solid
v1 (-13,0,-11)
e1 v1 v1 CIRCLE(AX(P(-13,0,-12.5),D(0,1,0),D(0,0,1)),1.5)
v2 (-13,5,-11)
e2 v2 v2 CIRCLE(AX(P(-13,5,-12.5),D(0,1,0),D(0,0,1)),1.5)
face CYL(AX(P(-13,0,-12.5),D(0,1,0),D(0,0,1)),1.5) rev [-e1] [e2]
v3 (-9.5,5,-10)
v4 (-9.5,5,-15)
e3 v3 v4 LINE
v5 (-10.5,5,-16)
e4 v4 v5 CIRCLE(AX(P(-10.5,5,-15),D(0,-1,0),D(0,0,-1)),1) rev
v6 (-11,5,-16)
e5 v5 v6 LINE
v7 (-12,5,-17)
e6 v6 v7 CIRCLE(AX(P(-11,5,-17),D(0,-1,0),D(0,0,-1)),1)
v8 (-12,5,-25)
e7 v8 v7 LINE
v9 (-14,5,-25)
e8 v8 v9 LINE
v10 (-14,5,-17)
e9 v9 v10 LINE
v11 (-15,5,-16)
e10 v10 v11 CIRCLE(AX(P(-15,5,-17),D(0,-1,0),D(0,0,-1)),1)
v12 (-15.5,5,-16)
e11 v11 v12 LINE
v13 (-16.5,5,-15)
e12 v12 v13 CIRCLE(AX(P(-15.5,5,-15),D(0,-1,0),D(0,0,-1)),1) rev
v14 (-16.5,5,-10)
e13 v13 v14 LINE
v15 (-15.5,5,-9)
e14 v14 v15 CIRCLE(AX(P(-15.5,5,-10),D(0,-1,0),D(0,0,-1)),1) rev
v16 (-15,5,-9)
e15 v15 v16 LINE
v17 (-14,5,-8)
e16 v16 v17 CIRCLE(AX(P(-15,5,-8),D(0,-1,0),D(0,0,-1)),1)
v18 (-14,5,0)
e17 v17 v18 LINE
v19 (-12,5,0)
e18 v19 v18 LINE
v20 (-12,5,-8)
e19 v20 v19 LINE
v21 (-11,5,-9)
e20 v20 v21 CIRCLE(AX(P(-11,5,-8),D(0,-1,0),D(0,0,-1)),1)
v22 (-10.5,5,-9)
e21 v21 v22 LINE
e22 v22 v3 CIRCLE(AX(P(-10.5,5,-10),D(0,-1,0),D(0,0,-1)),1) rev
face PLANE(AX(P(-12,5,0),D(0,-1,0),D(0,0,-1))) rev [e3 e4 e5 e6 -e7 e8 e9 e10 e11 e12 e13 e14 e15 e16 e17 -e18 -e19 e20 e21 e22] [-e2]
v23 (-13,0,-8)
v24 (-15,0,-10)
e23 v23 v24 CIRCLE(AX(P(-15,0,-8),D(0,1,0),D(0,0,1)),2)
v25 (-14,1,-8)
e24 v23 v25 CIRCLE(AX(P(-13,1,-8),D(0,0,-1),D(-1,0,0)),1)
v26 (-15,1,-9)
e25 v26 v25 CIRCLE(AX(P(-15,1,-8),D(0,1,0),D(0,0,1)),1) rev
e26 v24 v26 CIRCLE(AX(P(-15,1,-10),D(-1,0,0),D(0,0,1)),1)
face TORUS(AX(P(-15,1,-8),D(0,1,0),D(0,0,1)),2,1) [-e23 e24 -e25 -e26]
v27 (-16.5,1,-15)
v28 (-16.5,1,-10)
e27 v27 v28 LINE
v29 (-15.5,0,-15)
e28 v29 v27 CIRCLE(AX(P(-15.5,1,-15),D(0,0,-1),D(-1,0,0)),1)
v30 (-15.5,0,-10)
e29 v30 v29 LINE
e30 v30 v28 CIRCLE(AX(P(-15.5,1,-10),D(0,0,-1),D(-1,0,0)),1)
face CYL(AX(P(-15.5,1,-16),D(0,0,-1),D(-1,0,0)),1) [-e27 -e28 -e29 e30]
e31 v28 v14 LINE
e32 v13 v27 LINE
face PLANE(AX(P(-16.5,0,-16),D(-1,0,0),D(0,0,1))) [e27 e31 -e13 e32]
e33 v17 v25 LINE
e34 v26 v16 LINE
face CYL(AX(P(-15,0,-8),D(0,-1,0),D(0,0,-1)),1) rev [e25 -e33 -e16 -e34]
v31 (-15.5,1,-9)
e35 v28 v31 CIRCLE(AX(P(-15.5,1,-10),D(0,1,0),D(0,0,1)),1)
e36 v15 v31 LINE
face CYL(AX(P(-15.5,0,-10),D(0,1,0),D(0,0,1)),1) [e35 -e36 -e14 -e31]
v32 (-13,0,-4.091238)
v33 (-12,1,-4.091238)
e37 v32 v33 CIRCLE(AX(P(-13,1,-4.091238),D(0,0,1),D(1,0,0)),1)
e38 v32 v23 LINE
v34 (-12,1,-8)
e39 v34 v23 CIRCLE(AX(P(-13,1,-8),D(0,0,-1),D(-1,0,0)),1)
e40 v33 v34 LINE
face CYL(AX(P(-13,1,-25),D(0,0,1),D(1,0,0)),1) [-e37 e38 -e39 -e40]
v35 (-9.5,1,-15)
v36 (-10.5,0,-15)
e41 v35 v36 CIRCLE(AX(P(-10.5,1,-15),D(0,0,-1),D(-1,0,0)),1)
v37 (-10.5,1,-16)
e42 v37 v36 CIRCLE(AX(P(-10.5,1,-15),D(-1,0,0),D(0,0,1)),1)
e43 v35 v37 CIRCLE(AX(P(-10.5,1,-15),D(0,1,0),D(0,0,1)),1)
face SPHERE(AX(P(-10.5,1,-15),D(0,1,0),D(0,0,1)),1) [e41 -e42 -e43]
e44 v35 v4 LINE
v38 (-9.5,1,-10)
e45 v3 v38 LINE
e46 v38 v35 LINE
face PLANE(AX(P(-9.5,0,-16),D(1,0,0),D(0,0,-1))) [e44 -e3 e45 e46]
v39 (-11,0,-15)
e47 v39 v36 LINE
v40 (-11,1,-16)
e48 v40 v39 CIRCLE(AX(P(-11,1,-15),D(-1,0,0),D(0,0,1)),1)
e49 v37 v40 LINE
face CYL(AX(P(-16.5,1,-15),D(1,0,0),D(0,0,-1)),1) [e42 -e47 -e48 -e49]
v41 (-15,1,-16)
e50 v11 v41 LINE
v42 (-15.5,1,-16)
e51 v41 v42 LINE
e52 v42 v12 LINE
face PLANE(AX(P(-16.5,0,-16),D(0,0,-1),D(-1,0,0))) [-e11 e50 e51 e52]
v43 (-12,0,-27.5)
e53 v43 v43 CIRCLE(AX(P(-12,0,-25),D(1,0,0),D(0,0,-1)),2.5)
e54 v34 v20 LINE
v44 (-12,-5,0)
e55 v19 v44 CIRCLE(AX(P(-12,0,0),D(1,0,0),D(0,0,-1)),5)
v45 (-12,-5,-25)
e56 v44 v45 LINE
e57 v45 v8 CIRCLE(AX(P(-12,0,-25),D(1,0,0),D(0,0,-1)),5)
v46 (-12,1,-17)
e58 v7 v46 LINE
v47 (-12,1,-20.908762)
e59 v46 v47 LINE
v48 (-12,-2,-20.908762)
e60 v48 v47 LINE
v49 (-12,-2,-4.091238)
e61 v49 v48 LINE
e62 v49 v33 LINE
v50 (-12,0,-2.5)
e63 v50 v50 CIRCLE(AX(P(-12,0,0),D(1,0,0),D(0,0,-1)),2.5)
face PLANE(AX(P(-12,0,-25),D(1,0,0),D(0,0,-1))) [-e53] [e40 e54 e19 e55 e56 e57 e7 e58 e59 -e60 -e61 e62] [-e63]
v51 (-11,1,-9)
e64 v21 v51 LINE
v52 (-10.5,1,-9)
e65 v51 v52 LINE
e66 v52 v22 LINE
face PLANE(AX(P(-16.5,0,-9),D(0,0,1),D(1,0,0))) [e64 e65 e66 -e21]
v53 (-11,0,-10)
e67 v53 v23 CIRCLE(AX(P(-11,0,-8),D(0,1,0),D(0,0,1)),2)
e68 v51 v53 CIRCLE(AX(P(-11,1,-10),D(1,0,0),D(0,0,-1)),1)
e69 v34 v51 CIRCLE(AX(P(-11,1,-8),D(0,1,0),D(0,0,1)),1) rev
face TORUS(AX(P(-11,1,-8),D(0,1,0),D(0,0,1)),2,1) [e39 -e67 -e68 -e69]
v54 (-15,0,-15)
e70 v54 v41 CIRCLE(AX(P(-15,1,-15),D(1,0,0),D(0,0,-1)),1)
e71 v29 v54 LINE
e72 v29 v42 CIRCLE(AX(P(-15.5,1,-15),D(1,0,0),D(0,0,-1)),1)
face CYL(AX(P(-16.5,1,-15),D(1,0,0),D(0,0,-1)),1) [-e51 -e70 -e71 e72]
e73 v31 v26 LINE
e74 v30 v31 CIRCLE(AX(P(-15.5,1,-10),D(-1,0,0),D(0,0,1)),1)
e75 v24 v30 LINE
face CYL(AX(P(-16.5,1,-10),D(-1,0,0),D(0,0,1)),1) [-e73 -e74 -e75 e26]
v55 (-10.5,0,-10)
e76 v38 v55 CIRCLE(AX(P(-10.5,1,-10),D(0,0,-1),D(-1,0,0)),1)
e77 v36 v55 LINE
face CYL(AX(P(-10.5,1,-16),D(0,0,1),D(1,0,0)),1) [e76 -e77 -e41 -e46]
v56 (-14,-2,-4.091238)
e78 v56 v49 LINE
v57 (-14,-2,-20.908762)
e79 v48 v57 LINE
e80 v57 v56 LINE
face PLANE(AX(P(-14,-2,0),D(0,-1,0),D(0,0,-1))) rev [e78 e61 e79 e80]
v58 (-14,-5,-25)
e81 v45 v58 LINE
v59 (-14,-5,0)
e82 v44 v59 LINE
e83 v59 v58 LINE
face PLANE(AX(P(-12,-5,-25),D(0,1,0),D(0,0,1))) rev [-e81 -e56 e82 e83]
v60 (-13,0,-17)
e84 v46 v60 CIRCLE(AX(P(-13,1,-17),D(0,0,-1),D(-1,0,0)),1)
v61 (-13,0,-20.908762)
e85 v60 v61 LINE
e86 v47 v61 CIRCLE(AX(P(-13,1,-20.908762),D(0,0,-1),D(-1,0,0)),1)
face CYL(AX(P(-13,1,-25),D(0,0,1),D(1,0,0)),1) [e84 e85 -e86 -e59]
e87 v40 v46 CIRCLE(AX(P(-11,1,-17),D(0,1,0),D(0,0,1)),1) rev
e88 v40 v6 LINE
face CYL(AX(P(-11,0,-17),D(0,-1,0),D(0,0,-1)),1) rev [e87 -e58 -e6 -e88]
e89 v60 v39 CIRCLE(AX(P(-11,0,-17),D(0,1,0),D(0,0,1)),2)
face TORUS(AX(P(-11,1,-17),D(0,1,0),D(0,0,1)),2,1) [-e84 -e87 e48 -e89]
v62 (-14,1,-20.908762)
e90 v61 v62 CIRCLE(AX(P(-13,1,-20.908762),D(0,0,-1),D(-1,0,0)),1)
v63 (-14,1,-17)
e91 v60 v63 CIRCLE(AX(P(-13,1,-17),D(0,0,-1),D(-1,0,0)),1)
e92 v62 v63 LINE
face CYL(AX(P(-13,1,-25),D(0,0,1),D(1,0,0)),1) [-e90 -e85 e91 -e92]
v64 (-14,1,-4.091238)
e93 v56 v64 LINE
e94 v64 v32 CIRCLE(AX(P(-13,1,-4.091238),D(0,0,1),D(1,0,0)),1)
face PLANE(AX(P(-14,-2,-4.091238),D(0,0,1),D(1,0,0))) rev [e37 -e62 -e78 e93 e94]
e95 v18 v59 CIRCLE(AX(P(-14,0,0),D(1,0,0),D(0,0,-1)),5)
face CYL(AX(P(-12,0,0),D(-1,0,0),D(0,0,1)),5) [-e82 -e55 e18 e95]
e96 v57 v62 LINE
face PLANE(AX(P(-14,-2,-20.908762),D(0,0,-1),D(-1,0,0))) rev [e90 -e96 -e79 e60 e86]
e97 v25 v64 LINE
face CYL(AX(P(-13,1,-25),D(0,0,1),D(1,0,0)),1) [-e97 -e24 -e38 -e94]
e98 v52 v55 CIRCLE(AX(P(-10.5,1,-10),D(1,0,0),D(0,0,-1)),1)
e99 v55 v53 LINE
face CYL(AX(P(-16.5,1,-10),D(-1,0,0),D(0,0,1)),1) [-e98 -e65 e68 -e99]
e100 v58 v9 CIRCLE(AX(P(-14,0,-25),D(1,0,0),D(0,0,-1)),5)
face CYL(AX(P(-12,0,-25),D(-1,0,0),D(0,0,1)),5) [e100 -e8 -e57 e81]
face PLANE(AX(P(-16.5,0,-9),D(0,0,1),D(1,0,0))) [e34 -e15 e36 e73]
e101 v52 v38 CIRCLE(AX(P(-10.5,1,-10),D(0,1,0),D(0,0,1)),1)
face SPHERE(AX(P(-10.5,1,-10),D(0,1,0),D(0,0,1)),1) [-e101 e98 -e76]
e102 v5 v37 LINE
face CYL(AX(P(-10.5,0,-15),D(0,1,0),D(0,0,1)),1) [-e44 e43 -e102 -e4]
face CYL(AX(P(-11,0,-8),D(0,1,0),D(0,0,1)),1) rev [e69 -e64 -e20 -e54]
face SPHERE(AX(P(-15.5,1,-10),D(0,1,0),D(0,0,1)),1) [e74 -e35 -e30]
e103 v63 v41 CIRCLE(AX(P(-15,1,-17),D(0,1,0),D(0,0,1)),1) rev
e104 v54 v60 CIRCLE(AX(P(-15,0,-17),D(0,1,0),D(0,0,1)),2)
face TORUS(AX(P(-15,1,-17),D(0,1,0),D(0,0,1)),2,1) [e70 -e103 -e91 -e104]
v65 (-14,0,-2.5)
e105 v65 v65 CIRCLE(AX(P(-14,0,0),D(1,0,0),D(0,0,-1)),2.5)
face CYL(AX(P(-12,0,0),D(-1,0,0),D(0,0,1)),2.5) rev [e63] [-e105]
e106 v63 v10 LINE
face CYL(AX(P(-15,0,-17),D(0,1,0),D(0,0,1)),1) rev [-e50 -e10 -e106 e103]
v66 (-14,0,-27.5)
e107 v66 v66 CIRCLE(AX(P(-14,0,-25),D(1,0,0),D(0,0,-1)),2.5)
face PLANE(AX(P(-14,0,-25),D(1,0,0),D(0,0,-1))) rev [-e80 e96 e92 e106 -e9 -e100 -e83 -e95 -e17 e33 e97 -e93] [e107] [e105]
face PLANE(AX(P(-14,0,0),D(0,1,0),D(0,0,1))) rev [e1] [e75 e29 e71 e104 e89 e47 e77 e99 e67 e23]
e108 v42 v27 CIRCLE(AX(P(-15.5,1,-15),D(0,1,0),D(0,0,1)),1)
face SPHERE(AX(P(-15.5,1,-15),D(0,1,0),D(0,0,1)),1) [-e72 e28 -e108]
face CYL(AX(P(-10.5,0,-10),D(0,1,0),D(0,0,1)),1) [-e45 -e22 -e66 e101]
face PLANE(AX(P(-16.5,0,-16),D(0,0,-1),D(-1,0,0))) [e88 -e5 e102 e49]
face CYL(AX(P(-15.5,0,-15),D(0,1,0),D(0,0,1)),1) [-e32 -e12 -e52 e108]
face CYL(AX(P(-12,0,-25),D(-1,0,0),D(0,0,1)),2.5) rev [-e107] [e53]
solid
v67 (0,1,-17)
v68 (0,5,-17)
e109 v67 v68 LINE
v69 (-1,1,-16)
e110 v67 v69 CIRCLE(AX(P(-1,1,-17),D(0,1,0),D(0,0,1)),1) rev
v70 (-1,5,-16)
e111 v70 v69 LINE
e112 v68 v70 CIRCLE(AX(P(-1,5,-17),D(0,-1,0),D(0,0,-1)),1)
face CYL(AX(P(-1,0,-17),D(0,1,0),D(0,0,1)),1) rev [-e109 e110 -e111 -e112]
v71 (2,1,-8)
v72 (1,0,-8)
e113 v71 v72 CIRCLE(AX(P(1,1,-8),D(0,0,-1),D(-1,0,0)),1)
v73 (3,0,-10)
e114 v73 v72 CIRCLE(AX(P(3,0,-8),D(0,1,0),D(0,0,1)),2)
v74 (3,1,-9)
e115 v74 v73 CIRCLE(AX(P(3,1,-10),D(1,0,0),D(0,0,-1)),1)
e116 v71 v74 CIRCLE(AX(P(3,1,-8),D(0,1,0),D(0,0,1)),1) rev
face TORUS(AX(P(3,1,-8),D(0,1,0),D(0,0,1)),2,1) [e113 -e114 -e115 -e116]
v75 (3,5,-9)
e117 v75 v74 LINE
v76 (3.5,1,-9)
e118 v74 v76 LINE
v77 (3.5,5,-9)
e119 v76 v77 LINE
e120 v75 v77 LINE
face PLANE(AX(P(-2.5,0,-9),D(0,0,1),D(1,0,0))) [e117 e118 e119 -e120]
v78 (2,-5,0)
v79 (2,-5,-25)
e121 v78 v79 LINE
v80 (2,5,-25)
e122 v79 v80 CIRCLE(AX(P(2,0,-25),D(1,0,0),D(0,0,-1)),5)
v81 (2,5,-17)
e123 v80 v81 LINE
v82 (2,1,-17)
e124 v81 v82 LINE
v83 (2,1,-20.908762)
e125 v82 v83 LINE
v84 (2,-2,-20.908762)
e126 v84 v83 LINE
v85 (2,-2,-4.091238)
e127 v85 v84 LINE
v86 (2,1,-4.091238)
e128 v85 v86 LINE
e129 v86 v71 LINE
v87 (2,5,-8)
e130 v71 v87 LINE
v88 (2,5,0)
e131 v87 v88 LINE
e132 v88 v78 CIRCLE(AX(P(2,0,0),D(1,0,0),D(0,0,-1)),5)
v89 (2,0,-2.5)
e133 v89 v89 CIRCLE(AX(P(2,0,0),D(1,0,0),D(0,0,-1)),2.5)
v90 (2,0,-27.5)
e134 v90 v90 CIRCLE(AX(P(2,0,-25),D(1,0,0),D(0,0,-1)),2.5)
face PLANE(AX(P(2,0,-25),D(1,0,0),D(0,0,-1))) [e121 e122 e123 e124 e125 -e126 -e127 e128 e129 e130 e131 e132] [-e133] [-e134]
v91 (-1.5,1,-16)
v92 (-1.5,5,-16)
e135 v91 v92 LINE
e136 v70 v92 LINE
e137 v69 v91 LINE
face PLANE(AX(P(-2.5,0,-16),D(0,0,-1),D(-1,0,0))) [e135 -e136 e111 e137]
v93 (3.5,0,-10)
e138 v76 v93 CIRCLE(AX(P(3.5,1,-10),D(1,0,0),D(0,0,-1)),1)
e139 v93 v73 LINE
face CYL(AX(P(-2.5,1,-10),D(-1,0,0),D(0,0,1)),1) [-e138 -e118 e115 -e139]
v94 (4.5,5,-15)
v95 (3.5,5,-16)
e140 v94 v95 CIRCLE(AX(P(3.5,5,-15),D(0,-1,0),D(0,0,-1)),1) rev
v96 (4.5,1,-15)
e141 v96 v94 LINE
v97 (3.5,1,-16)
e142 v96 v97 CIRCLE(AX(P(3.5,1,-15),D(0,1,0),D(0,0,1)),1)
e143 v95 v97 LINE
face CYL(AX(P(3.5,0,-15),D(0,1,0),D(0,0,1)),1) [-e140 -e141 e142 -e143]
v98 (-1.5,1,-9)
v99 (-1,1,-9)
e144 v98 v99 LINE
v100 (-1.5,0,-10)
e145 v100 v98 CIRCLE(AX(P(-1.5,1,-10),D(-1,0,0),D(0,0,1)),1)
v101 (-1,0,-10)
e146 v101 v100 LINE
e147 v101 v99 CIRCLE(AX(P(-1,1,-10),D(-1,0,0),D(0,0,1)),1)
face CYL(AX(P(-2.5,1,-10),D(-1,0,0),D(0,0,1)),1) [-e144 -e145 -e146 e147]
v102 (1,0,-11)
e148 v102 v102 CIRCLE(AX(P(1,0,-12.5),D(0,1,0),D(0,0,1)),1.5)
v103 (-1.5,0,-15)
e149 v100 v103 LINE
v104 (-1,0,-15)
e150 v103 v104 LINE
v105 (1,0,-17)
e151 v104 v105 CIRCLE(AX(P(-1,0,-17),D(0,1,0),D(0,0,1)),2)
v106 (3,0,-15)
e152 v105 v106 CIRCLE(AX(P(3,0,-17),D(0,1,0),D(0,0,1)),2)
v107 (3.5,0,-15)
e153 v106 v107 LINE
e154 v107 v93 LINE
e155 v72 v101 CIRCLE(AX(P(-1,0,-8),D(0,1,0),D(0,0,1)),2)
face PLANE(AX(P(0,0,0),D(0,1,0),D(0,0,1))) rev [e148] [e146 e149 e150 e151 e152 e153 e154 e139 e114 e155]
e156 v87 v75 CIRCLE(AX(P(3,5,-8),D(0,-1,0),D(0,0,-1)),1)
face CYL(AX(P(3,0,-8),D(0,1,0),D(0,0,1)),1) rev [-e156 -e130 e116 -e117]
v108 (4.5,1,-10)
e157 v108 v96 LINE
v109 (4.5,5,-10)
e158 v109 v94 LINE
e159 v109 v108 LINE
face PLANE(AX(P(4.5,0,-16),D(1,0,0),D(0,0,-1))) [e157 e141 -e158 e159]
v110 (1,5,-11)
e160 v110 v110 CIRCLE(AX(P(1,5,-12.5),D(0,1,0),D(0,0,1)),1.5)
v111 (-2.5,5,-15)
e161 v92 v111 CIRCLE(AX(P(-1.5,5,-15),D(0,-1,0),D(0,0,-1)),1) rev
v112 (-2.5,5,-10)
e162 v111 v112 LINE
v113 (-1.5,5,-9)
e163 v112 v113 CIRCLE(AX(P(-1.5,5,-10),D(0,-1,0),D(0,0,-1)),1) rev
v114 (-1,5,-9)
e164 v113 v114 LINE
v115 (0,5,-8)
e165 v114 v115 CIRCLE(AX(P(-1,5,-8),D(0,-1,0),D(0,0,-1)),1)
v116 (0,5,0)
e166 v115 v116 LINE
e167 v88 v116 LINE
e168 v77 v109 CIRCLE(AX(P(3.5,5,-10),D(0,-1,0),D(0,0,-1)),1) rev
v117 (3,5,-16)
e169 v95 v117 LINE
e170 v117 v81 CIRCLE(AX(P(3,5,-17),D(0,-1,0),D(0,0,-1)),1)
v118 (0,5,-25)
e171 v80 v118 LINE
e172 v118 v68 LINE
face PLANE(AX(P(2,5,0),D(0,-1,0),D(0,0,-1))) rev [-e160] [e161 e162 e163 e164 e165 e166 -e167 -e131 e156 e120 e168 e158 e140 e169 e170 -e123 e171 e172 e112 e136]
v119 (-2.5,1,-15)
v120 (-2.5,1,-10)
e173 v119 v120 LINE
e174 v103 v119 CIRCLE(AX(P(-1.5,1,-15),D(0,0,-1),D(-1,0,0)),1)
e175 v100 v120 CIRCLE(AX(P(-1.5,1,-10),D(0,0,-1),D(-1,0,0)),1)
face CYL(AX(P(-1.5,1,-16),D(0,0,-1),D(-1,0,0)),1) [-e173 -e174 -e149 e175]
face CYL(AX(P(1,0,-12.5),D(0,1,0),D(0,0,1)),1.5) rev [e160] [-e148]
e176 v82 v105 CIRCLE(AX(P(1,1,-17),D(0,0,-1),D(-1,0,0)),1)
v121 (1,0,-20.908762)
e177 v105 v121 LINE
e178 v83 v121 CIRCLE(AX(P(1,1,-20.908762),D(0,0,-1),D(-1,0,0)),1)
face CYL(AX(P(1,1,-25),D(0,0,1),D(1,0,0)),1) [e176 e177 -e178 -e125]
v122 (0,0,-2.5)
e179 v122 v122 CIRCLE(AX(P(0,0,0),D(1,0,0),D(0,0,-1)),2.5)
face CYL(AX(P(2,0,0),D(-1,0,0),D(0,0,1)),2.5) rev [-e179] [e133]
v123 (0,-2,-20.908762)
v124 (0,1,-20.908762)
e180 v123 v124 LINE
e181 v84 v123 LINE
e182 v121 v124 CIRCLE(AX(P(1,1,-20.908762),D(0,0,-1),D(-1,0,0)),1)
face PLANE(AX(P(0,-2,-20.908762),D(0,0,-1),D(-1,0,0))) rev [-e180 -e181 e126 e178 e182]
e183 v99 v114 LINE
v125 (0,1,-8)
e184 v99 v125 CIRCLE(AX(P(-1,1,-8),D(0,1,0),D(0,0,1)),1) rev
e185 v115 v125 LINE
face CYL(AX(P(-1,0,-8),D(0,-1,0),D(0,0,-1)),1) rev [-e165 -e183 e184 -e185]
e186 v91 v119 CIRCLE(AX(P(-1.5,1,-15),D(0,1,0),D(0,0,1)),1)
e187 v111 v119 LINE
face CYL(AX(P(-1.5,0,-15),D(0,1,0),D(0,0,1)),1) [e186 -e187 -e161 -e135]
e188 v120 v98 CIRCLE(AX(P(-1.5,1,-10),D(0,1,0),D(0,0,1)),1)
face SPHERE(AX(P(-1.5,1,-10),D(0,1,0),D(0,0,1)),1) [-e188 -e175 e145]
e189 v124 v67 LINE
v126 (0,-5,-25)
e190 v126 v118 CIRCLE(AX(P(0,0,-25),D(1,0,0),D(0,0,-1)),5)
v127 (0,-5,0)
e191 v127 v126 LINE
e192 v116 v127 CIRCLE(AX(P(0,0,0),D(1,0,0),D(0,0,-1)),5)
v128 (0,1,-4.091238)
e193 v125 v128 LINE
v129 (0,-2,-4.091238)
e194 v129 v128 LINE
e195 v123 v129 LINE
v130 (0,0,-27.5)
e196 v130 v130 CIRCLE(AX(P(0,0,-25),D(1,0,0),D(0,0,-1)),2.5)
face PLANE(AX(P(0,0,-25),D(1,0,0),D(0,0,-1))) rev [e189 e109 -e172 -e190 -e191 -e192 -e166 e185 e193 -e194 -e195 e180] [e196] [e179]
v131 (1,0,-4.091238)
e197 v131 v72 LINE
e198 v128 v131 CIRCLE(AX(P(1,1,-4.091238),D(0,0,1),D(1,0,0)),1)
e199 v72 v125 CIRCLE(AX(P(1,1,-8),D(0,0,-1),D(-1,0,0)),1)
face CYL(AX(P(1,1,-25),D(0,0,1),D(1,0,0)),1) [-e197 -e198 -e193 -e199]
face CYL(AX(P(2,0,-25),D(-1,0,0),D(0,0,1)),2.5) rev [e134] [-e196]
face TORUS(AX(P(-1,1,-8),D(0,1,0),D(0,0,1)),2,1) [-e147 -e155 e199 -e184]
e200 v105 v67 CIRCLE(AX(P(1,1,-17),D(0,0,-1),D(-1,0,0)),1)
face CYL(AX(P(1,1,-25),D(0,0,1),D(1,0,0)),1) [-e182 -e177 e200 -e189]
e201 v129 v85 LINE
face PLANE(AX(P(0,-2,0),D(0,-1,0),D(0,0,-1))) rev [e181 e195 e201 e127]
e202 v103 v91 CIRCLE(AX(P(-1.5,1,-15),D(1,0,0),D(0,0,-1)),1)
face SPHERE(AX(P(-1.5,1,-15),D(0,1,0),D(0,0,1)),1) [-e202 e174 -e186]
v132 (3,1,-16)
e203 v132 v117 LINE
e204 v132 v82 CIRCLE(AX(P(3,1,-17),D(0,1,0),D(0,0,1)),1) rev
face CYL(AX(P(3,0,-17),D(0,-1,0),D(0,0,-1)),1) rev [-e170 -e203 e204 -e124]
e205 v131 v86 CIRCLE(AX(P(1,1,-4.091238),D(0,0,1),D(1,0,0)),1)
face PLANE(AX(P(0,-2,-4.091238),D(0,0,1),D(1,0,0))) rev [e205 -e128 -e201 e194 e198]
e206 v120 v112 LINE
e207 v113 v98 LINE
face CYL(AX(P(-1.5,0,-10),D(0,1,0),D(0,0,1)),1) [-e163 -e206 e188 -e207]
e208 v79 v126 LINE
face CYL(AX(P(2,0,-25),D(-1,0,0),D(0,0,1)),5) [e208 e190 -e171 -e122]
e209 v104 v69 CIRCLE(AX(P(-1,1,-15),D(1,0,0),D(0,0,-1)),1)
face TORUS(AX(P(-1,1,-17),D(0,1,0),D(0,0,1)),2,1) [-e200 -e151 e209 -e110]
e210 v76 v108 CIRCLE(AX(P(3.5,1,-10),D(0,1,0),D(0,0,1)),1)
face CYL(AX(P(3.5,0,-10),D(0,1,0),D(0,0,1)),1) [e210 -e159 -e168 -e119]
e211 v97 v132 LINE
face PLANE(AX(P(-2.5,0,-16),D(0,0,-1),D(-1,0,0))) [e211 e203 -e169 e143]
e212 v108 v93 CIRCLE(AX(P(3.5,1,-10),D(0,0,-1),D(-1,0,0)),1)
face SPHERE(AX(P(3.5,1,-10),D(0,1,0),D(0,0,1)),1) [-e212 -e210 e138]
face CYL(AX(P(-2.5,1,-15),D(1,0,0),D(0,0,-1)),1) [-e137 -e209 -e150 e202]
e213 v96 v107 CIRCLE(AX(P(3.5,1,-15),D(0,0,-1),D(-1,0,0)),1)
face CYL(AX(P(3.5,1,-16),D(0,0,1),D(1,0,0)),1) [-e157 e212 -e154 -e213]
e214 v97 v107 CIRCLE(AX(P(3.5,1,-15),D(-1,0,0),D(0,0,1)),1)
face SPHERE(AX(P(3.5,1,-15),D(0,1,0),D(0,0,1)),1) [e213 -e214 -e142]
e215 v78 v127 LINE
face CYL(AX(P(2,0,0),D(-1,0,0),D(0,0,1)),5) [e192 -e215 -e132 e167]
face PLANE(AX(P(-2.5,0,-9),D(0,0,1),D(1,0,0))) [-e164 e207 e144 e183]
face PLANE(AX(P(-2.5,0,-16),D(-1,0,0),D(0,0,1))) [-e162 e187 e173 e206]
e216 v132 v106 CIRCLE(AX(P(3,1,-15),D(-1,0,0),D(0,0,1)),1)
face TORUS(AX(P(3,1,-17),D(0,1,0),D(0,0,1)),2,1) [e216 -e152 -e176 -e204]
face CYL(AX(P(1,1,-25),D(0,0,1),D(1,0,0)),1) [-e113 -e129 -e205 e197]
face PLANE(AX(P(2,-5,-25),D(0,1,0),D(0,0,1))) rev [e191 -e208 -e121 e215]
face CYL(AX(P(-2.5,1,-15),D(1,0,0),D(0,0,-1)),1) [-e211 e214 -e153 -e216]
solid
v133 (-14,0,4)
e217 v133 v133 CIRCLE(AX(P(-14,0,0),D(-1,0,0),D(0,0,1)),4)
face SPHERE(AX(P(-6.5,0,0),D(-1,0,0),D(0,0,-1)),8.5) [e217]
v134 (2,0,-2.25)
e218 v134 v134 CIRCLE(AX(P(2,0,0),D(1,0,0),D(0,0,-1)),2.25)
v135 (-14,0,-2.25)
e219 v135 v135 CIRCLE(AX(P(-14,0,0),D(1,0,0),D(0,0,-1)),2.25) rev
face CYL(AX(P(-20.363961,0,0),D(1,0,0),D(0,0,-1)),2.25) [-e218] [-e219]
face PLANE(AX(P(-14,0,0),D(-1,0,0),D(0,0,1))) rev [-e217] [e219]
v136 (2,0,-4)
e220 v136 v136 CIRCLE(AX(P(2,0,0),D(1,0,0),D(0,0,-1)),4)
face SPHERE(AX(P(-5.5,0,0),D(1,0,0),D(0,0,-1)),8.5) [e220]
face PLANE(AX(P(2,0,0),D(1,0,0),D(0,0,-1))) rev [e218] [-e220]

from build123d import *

# Parameters (mm, degrees)
SKETCH1_R           = 2.5
BOSS_EXTRUDE1_DEPTH = 2
SKETCH3_W           = 7
SKETCH3_H           = 7
BOSS_EXTRUDE2_DEPTH = 5
SKETCH4_R           = 1.5
CUT_EXTRUDE1_DEPTH  = 5
SKETCH5_W           = 2
SKETCH5_H           = 16.817523736
CUT_EXTRUDE2_DEPTH  = 2
FILLET1_R           = 1
FILLET2_R           = 1
LPATTERN1_COUNT     = 2
LPATTERN1_PITCH     = 14
SKETCH6_R           = 2.25
BOSS_EXTRUDE3_DEPTH = 16


with BuildPart() as part:
    # Sketch1 → Boss-Extrude1 (new body)
    with BuildSketch(Plane(origin=(0, 0, 0), x_dir=(0, 0, -1), z_dir=(1, 0, 0))):
        with BuildLine():
            Line((0, 5), (25, 5))
            ThreePointArc((25, 5), (30, 0), (25, -5))
            Line((25, -5), (0, -5))
            ThreePointArc((0, -5), (-5, 0), (0, 5))
        make_face()
        Circle(SKETCH1_R, mode=Mode.SUBTRACT)
        with Locations((25, 0)):
            Circle(SKETCH1_R, mode=Mode.SUBTRACT)
    extrude(amount=BOSS_EXTRUDE1_DEPTH)

    # Sketch3 → Boss-Extrude2 (add)
    with BuildSketch(Plane(origin=(0, 5, 0), x_dir=(1, 0, 0), z_dir=(0, 1, 0))):
        with Locations((1, 12.5)):
            Rectangle(SKETCH3_W, SKETCH3_H)
    extrude(amount=-BOSS_EXTRUDE2_DEPTH)

    # Sketch4 → Cut-Extrude1 (cut)
    with BuildSketch(Plane(origin=(0, 5, 0), x_dir=(1, 0, 0), z_dir=(0, 1, 0))):
        with Locations(Location((1, 12.5, 0), (0, 0, 270))):
            Circle(SKETCH4_R)
    extrude(amount=-CUT_EXTRUDE1_DEPTH, mode=Mode.SUBTRACT)

    # Sketch5 → Cut-Extrude2 (cut)
    with BuildSketch(Plane(origin=(0, 0, 0), x_dir=(1, 0, 0), z_dir=(0, 1, 0))):
        with Locations((1, 12.5)):
            Rectangle(SKETCH5_W, SKETCH5_H)
    extrude(amount=-CUT_EXTRUDE2_DEPTH, mode=Mode.SUBTRACT)

    # Fillet1
    fillet1_edges = [part.edges().sort_by_distance(p)[0] for p in [
        (0, 2.5, -9),
        (0, 2.5, -16),
        (-2.5, 2.5, -16),
        (4.5, 2.5, -16),
        (2, 2.5, -9),
        (4.5, 2.5, -9),
        (-2.5, 2.5, -9),
        (2, 2.5, -16),
    ]]
    fillet(fillet1_edges, radius=FILLET1_R)

    # Fillet2
    fillet2_edges = [part.edges().sort_by_distance(p)[0] for p in [
        (2, 0, -18.954380934),
        (2.292893219, 0, -16.292893219),
        (3.25, 0, -16),
        (4.207106781, 0, -15.707106781),
        (4.5, 0, -12.5),
        (4.207106781, 0, -9.292893219),
        (3.25, 0, -9),
        (2, 0, -6.045619066),
        (0, 0, -6.045619066),
        (-0.292893219, 0, -8.707106781),
        (-1.25, 0, -9),
        (-2.207106781, 0, -9.292893219),
        (-2.5, 0, -12.5),
        (-2.207106781, 0, -15.707106781),
        (-1.25, 0, -16),
        (0, 0, -18.954380934),
        (2.292893219, 0, -8.707106781),
        (-0.292893219, 0, -16.292893219),
    ]]
    fillet(fillet2_edges, radius=FILLET2_R - 0.0001)  # a hair under: the kernel refuses the full size


with BuildPart() as lpattern1_1:
    # LPattern1: pattern copy
    add(part.part.moved(Location(Vector(-1, 0, 0) * (1 * LPATTERN1_PITCH))))


with BuildPart() as body_3:
    # Sketch6 → Boss-Extrude3 (new body)
    with BuildSketch(Plane(origin=(2, 0, 0), x_dir=(0, 0, -1), z_dir=(1, 0, 0))):
        Circle(SKETCH6_R)
    extrude(amount=-BOSS_EXTRUDE3_DEPTH)

    # Sketch7<4> → Revolve3 (revolve)
    with BuildSketch(Plane(origin=(0, 0, 0), x_dir=(1, 0, 0), z_dir=(0, 1, 0)), mode=Mode.PRIVATE) as revolve3_sk:
        with BuildLine():
            Line((3, 0), (2, 0))
            Line((2, 0), (2, -4))
            ThreePointArc((2, -4), (2.746211251, -2.061552813), (3, 0))
        make_face()
    revolve(revolve3_sk.sketch.rotate(Axis((3, 0, 0), (-1, 0, 0)), 180), axis=Axis((3, 0, 0), (-1, 0, 0)))

    # Sketch7 → Revolve4 (revolve)
    with BuildSketch(Plane(origin=(0, 0, 0), x_dir=(1, 0, 0), z_dir=(0, 1, 0)), mode=Mode.PRIVATE) as revolve4_sk:
        with BuildLine():
            Line((-14, 0), (-14, -4))
            ThreePointArc((-14, -4), (-14.746211251, -2.061552813), (-15, 0))
            Line((-15, 0), (-14, 0))
        make_face()
    revolve(revolve4_sk.sketch.rotate(Axis((-15, 0, 0), (1, 0, 0)), 180), axis=Axis((-15, 0, 0), (1, 0, 0)))


solid = Compound([part.part, lpattern1_1.part, body_3.part])
